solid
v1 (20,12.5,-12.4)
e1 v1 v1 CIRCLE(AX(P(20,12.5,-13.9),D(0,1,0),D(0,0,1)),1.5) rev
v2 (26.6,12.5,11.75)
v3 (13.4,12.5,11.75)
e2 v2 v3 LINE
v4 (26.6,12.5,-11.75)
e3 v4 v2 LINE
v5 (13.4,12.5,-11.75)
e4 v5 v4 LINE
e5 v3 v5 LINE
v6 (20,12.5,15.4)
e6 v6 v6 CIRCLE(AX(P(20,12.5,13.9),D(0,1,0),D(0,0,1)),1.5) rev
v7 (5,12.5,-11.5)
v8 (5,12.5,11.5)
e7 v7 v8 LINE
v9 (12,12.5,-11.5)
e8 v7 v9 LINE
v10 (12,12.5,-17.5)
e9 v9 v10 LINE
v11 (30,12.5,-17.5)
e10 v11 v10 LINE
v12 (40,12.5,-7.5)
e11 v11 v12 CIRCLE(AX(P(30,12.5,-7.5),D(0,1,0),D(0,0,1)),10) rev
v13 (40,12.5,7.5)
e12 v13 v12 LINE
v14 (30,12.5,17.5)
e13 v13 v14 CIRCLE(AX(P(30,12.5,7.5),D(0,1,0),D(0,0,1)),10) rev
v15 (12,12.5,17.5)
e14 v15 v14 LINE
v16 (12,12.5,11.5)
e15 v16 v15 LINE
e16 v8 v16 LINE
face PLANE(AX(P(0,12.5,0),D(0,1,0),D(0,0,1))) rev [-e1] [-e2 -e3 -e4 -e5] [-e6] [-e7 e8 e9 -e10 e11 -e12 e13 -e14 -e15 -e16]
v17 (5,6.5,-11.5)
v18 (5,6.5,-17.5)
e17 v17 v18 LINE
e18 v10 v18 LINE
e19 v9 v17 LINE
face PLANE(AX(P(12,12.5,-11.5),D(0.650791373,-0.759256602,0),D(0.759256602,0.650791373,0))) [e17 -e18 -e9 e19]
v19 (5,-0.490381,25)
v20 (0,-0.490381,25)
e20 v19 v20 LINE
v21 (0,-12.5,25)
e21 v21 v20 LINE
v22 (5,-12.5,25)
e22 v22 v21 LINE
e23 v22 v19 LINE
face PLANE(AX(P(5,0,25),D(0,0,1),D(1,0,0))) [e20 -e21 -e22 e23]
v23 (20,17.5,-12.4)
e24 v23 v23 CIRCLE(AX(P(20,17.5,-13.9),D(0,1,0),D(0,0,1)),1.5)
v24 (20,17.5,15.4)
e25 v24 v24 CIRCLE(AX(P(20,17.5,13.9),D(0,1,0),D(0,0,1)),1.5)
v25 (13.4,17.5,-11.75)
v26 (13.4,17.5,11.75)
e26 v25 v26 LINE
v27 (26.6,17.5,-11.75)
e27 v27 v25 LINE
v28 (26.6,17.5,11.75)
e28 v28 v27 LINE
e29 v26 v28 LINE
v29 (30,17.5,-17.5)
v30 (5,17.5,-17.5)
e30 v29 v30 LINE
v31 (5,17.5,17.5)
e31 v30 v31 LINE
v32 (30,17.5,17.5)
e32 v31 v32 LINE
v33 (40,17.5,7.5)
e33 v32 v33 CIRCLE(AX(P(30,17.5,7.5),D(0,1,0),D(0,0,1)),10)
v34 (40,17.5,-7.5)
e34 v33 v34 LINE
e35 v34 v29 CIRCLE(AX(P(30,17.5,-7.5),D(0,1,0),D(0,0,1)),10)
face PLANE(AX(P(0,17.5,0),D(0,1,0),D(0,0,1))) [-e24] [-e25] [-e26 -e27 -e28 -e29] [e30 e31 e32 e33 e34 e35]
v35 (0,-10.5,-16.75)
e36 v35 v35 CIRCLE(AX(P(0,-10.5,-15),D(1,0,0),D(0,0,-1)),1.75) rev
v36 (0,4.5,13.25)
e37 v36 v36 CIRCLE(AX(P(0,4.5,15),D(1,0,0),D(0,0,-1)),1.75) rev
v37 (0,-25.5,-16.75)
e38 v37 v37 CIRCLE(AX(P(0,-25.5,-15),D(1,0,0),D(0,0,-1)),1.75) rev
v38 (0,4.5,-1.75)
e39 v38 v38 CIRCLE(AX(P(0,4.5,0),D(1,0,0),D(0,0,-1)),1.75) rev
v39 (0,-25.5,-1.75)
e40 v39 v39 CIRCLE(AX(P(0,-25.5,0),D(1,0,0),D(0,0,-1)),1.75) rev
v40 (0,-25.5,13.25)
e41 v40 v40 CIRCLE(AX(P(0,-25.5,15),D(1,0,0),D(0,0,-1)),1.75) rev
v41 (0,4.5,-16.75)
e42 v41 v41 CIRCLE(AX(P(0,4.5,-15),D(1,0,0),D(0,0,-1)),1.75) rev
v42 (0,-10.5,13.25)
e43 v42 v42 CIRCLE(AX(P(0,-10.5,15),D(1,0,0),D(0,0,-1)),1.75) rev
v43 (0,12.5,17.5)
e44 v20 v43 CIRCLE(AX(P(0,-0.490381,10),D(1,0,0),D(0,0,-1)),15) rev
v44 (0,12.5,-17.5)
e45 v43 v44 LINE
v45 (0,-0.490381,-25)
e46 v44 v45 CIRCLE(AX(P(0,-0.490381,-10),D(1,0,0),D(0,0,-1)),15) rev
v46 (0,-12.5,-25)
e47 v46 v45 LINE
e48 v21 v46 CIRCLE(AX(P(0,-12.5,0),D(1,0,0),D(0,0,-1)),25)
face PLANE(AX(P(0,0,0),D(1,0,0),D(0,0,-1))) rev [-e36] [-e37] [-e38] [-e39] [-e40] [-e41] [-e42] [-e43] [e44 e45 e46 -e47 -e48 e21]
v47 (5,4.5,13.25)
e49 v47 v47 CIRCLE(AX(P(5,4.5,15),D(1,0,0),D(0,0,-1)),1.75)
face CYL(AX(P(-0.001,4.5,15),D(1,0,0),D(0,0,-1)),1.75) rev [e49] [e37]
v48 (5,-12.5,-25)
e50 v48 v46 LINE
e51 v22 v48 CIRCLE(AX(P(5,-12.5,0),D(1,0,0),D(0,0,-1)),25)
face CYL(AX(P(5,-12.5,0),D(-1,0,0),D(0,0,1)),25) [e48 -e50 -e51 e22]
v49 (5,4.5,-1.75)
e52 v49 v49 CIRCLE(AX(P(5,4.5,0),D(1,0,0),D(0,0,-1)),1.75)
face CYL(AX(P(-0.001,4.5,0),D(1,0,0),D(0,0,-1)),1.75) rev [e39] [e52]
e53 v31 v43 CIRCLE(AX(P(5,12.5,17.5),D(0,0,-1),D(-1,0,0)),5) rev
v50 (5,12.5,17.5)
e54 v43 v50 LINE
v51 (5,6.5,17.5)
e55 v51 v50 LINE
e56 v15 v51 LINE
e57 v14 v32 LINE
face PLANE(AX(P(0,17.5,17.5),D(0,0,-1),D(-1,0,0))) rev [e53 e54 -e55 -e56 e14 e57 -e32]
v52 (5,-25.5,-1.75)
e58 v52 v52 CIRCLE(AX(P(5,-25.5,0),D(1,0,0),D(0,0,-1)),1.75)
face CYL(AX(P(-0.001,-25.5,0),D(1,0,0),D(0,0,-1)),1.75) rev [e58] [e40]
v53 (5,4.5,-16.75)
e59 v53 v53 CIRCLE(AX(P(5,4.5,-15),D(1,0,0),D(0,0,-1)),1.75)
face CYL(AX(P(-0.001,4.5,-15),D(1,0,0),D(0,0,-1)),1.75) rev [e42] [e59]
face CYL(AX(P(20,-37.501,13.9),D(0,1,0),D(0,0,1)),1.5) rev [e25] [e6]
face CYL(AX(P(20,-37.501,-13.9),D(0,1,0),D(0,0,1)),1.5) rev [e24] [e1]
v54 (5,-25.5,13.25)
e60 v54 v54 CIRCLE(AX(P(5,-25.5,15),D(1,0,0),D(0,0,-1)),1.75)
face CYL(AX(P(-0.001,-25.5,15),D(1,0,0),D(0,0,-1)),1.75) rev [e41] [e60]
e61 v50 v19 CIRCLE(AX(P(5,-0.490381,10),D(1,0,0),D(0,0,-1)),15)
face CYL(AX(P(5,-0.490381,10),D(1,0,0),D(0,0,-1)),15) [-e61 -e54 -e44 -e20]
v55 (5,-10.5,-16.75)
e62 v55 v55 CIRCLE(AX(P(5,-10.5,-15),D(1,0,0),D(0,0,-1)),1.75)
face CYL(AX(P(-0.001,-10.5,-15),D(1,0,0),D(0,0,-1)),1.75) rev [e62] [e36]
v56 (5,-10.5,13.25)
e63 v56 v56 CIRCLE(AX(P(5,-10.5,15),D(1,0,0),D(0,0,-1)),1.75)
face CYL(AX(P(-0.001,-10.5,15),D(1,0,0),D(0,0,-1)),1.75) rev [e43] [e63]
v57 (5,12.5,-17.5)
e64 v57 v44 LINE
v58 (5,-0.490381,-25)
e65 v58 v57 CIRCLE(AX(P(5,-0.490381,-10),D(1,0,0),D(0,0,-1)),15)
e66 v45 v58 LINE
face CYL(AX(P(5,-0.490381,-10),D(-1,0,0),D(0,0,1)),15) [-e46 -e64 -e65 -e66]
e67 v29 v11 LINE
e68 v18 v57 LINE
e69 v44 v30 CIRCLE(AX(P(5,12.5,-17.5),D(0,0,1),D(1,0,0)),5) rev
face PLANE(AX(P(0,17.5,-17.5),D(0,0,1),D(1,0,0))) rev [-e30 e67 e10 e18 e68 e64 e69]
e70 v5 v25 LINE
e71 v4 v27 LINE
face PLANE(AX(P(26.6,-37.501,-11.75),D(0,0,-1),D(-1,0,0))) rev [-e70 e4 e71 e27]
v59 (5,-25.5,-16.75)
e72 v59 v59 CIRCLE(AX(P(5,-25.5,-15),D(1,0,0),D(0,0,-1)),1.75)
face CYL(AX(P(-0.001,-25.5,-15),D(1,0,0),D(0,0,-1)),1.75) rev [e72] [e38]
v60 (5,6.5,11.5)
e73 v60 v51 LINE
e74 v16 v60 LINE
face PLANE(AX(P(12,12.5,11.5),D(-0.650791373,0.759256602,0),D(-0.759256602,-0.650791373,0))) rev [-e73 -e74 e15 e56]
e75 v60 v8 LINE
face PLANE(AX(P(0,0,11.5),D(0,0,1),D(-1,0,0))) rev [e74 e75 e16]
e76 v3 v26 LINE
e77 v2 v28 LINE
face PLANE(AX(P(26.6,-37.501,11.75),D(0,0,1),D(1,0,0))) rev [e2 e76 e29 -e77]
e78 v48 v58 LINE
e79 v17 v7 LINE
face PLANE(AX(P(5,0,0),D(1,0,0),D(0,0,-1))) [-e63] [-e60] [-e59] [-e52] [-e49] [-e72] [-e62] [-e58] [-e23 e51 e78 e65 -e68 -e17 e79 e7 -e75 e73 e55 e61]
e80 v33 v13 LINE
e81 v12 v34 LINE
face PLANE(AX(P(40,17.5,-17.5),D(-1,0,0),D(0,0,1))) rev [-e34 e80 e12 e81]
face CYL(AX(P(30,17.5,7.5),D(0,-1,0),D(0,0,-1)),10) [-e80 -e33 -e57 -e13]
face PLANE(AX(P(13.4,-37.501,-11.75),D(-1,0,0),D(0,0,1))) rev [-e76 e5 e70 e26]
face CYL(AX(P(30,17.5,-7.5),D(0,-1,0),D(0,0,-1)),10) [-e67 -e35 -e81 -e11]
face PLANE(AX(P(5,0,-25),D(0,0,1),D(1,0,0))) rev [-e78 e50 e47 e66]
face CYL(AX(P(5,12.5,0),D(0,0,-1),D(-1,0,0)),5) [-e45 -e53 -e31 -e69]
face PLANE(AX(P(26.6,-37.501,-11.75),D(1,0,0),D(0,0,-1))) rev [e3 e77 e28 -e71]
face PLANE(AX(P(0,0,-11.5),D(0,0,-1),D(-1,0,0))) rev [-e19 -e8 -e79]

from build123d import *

# Parameters (mm, degrees)
BOSS_EXTRUDE1_DEPTH = 5
CUT_EXTRUDE1_REACH  = 47.346
SKETCH2_R           = 1.75
SKETCH4_W           = 40
SKETCH4_H           = 35
BOSS_EXTRUDE2_DEPTH = 5
CUT_EXTRUDE2_REACH  = 69.454
SKETCH3_R           = 1.5
SKETCH3_W           = 23.5
SKETCH3_H           = 13.2
FILLET1_R           = 10
FILLET2_R           = 5
FILLET4_R           = 15
BOSS_EXTRUDE3_DEPTH = 6


with BuildPart() as part:
    # Sketch1 → Boss-Extrude1 (new body)
    with BuildSketch(Plane(origin=(0, 0, 0), x_dir=(0, 0, -1), z_dir=(1, 0, 0))):
        with BuildLine():
            ThreePointArc((-25, -12.5), (0, -37.5), (25, -12.5))
            Line((25, -12.5), (25, 12.5))
            Line((25, 12.5), (-25, 12.5))
            Line((-25, 12.5), (-25, -12.5))
        make_face()
    extrude(amount=BOSS_EXTRUDE1_DEPTH)

    # Sketch2 → Cut-Extrude1 (cut, up to next)
    with BuildSketch(Plane(origin=(5, 0, 0), x_dir=(0, 0, -1), z_dir=(1, 0, 0)), mode=Mode.PRIVATE) as cut_extrude1_sk1:
        with Locations((-15, -25.5)):
            Circle(SKETCH2_R)
    cut_extrude1_tool1 = extrude(cut_extrude1_sk1.sketch, amount=-CUT_EXTRUDE1_REACH, mode=Mode.PRIVATE) & part.part
    # Sketch2 → Cut-Extrude1 (cut, up to next)
    with BuildSketch(Plane(origin=(5, 0, 0), x_dir=(0, 0, -1), z_dir=(1, 0, 0)), mode=Mode.PRIVATE) as cut_extrude1_sk2:
        with Locations((15, -25.5)):
            Circle(SKETCH2_R)
    cut_extrude1_tool2 = extrude(cut_extrude1_sk2.sketch, amount=-CUT_EXTRUDE1_REACH, mode=Mode.PRIVATE) & part.part
    # Sketch2 → Cut-Extrude1 (cut, up to next)
    with BuildSketch(Plane(origin=(5, 0, 0), x_dir=(0, 0, -1), z_dir=(1, 0, 0)), mode=Mode.PRIVATE) as cut_extrude1_sk3:
        with Locations((-15, 4.5)):
            Circle(SKETCH2_R)
    cut_extrude1_tool3 = extrude(cut_extrude1_sk3.sketch, amount=-CUT_EXTRUDE1_REACH, mode=Mode.PRIVATE) & part.part
    # Sketch2 → Cut-Extrude1 (cut, up to next)
    with BuildSketch(Plane(origin=(5, 0, 0), x_dir=(0, 0, -1), z_dir=(1, 0, 0)), mode=Mode.PRIVATE) as cut_extrude1_sk4:
        with Locations((0, 4.5)):
            Circle(SKETCH2_R)
    cut_extrude1_tool4 = extrude(cut_extrude1_sk4.sketch, amount=-CUT_EXTRUDE1_REACH, mode=Mode.PRIVATE) & part.part
    # Sketch2 → Cut-Extrude1 (cut, up to next)
    with BuildSketch(Plane(origin=(5, 0, 0), x_dir=(0, 0, -1), z_dir=(1, 0, 0)), mode=Mode.PRIVATE) as cut_extrude1_sk5:
        with Locations((15, 4.5)):
            Circle(SKETCH2_R)
    cut_extrude1_tool5 = extrude(cut_extrude1_sk5.sketch, amount=-CUT_EXTRUDE1_REACH, mode=Mode.PRIVATE) & part.part
    # Sketch2 → Cut-Extrude1 (cut, up to next)
    with BuildSketch(Plane(origin=(5, 0, 0), x_dir=(0, 0, -1), z_dir=(1, 0, 0)), mode=Mode.PRIVATE) as cut_extrude1_sk6:
        with Locations((0, -25.5)):
            Circle(SKETCH2_R)
    cut_extrude1_tool6 = extrude(cut_extrude1_sk6.sketch, amount=-CUT_EXTRUDE1_REACH, mode=Mode.PRIVATE) & part.part
    # Sketch2 → Cut-Extrude1 (cut, up to next)
    with BuildSketch(Plane(origin=(5, 0, 0), x_dir=(0, 0, -1), z_dir=(1, 0, 0)), mode=Mode.PRIVATE) as cut_extrude1_sk7:
        with Locations((-15, -10.5)):
            Circle(SKETCH2_R)
    cut_extrude1_tool7 = extrude(cut_extrude1_sk7.sketch, amount=-CUT_EXTRUDE1_REACH, mode=Mode.PRIVATE) & part.part
    # Sketch2 → Cut-Extrude1 (cut, up to next)
    with BuildSketch(Plane(origin=(5, 0, 0), x_dir=(0, 0, -1), z_dir=(1, 0, 0)), mode=Mode.PRIVATE) as cut_extrude1_sk8:
        with Locations((15, -10.5)):
            Circle(SKETCH2_R)
    cut_extrude1_tool8 = extrude(cut_extrude1_sk8.sketch, amount=-CUT_EXTRUDE1_REACH, mode=Mode.PRIVATE) & part.part
    add(cut_extrude1_tool1.solids().sort_by_distance((5, -25.5, 15))[0], mode=Mode.SUBTRACT)
    add(cut_extrude1_tool2.solids().sort_by_distance((5, -25.5, -15))[0], mode=Mode.SUBTRACT)
    add(cut_extrude1_tool3.solids().sort_by_distance((5, 4.5, 15))[0], mode=Mode.SUBTRACT)
    add(cut_extrude1_tool4.solids().sort_by_distance((5, 4.5, 0))[0], mode=Mode.SUBTRACT)
    add(cut_extrude1_tool5.solids().sort_by_distance((5, 4.5, -15))[0], mode=Mode.SUBTRACT)
    add(cut_extrude1_tool6.solids().sort_by_distance((5, -25.5, 0))[0], mode=Mode.SUBTRACT)
    add(cut_extrude1_tool7.solids().sort_by_distance((5, -10.5, 15))[0], mode=Mode.SUBTRACT)
    add(cut_extrude1_tool8.solids().sort_by_distance((5, -10.5, -15))[0], mode=Mode.SUBTRACT)

    # Sketch4 → Boss-Extrude2 (add)
    with BuildSketch(Plane(origin=(0, 12.5, 0), x_dir=(1, 0, 0), z_dir=(0, 1, 0))):
        with Locations((20, 0)):
            Rectangle(SKETCH4_W, SKETCH4_H)
    extrude(amount=BOSS_EXTRUDE2_DEPTH)

    # Sketch3 → Cut-Extrude2 (cut, up to next)
    with BuildSketch(Plane(origin=(30, 17.5, 0), x_dir=(0, 0, -1), z_dir=(0, 1, 0)), mode=Mode.PRIVATE) as cut_extrude2_sk1:
        with Locations(Location((13.9, 10, 0), (0, 0, 180))):
            Circle(SKETCH3_R)
    cut_extrude2_tool1 = extrude(cut_extrude2_sk1.sketch, amount=-CUT_EXTRUDE2_REACH, mode=Mode.PRIVATE) & part.part
    # Sketch3 → Cut-Extrude2 (cut, up to next)
    with BuildSketch(Plane(origin=(30, 17.5, 0), x_dir=(0, 0, -1), z_dir=(0, 1, 0)), mode=Mode.PRIVATE) as cut_extrude2_sk2:
        with Locations(Location((-13.9, 10, 0), (0, 0, 180))):
            Circle(SKETCH3_R)
    cut_extrude2_tool2 = extrude(cut_extrude2_sk2.sketch, amount=-CUT_EXTRUDE2_REACH, mode=Mode.PRIVATE) & part.part
    # Sketch3 → Cut-Extrude2 (cut, up to next)
    with BuildSketch(Plane(origin=(30, 17.5, 0), x_dir=(0, 0, -1), z_dir=(0, 1, 0)), mode=Mode.PRIVATE) as cut_extrude2_sk3:
        with Locations((0, 10)):
            Rectangle(SKETCH3_W, SKETCH3_H)
    cut_extrude2_tool3 = extrude(cut_extrude2_sk3.sketch, amount=-CUT_EXTRUDE2_REACH, mode=Mode.PRIVATE) & part.part
    add(cut_extrude2_tool1.solids().sort_by_distance((20, 17.5, -13.9))[0], mode=Mode.SUBTRACT)
    add(cut_extrude2_tool2.solids().sort_by_distance((20, 17.5, 13.9))[0], mode=Mode.SUBTRACT)
    add(cut_extrude2_tool3.solids().sort_by_distance((20, 17.5, 0))[0], mode=Mode.SUBTRACT)

    # Fillet1
    fillet1_edges = [part.edges().sort_by_distance(p)[0] for p in [
        (40, 15, 17.5),
        (40, 15, -17.5),
    ]]
    fillet(fillet1_edges, radius=FILLET1_R)

    # Fillet2
    fillet2_edges = [part.edges().sort_by_distance(p)[0] for p in [
        (0, 17.5, 0),
    ]]
    fillet(fillet2_edges, radius=FILLET2_R)

    # Fillet4
    # the kernel refuses this fillet: 15 mm, written as the material it takes off along each edge
    with BuildSketch(Plane(origin=(-32.475952642, 12.5, 25), x_dir=(0, 0, -1), z_dir=(1, 0, 0))) as fillet4_piece_1:
        with BuildLine():
            CenterArc((15, -12.990381057), FILLET4_R, 120, 60)
            Line((0, -12.990381057), (-0.3, -12.990381057))
            Line((-0.3, -12.990381057), (-0.3, 0))
            Line((-0.3, 0), (0, 0.3))
            ThreePointArc((0, 0.3), (3.75, 0.3), (7.35, 0.259807621))
            Line((7.35, 0.259807621), (7.5, 0))
        make_face()
    extrude(amount=69.951905284, mode=Mode.SUBTRACT)
    with BuildSketch(Plane(origin=(-32.475952642, 12.5, -25), x_dir=(0, 0, 1), z_dir=(1, 0, 0))) as fillet4_piece_2:
        with BuildLine():
            CenterArc((15, 12.990381057), FILLET4_R, 180, 60)
            Line((0, 12.990381057), (-0.3, 12.990381057))
            Line((-0.3, 12.990381057), (-0.3, 0))
            Line((-0.3, 0), (0, -0.3))
            ThreePointArc((0, -0.3), (3.75, -0.3), (7.35, -0.259807621))
            Line((7.35, -0.259807621), (7.5, 0))
        make_face()
    extrude(amount=69.951905284, mode=Mode.SUBTRACT)

    # Sketch5 → Boss-Extrude3 (add)
    with BuildSketch(Plane(origin=(0, 0, -17.5), x_dir=(-1, 0, 0), z_dir=(0, 0, -1))):
        Polygon((-5, 6.5), (-5, 12.5), (-12, 12.5), align=None)
    boss_extrude3 = extrude(amount=-BOSS_EXTRUDE3_DEPTH)

    # Mirror1: Boss-Extrude3 across plane
    add(boss_extrude3.mirror(Plane.XY))


solid = part.part
